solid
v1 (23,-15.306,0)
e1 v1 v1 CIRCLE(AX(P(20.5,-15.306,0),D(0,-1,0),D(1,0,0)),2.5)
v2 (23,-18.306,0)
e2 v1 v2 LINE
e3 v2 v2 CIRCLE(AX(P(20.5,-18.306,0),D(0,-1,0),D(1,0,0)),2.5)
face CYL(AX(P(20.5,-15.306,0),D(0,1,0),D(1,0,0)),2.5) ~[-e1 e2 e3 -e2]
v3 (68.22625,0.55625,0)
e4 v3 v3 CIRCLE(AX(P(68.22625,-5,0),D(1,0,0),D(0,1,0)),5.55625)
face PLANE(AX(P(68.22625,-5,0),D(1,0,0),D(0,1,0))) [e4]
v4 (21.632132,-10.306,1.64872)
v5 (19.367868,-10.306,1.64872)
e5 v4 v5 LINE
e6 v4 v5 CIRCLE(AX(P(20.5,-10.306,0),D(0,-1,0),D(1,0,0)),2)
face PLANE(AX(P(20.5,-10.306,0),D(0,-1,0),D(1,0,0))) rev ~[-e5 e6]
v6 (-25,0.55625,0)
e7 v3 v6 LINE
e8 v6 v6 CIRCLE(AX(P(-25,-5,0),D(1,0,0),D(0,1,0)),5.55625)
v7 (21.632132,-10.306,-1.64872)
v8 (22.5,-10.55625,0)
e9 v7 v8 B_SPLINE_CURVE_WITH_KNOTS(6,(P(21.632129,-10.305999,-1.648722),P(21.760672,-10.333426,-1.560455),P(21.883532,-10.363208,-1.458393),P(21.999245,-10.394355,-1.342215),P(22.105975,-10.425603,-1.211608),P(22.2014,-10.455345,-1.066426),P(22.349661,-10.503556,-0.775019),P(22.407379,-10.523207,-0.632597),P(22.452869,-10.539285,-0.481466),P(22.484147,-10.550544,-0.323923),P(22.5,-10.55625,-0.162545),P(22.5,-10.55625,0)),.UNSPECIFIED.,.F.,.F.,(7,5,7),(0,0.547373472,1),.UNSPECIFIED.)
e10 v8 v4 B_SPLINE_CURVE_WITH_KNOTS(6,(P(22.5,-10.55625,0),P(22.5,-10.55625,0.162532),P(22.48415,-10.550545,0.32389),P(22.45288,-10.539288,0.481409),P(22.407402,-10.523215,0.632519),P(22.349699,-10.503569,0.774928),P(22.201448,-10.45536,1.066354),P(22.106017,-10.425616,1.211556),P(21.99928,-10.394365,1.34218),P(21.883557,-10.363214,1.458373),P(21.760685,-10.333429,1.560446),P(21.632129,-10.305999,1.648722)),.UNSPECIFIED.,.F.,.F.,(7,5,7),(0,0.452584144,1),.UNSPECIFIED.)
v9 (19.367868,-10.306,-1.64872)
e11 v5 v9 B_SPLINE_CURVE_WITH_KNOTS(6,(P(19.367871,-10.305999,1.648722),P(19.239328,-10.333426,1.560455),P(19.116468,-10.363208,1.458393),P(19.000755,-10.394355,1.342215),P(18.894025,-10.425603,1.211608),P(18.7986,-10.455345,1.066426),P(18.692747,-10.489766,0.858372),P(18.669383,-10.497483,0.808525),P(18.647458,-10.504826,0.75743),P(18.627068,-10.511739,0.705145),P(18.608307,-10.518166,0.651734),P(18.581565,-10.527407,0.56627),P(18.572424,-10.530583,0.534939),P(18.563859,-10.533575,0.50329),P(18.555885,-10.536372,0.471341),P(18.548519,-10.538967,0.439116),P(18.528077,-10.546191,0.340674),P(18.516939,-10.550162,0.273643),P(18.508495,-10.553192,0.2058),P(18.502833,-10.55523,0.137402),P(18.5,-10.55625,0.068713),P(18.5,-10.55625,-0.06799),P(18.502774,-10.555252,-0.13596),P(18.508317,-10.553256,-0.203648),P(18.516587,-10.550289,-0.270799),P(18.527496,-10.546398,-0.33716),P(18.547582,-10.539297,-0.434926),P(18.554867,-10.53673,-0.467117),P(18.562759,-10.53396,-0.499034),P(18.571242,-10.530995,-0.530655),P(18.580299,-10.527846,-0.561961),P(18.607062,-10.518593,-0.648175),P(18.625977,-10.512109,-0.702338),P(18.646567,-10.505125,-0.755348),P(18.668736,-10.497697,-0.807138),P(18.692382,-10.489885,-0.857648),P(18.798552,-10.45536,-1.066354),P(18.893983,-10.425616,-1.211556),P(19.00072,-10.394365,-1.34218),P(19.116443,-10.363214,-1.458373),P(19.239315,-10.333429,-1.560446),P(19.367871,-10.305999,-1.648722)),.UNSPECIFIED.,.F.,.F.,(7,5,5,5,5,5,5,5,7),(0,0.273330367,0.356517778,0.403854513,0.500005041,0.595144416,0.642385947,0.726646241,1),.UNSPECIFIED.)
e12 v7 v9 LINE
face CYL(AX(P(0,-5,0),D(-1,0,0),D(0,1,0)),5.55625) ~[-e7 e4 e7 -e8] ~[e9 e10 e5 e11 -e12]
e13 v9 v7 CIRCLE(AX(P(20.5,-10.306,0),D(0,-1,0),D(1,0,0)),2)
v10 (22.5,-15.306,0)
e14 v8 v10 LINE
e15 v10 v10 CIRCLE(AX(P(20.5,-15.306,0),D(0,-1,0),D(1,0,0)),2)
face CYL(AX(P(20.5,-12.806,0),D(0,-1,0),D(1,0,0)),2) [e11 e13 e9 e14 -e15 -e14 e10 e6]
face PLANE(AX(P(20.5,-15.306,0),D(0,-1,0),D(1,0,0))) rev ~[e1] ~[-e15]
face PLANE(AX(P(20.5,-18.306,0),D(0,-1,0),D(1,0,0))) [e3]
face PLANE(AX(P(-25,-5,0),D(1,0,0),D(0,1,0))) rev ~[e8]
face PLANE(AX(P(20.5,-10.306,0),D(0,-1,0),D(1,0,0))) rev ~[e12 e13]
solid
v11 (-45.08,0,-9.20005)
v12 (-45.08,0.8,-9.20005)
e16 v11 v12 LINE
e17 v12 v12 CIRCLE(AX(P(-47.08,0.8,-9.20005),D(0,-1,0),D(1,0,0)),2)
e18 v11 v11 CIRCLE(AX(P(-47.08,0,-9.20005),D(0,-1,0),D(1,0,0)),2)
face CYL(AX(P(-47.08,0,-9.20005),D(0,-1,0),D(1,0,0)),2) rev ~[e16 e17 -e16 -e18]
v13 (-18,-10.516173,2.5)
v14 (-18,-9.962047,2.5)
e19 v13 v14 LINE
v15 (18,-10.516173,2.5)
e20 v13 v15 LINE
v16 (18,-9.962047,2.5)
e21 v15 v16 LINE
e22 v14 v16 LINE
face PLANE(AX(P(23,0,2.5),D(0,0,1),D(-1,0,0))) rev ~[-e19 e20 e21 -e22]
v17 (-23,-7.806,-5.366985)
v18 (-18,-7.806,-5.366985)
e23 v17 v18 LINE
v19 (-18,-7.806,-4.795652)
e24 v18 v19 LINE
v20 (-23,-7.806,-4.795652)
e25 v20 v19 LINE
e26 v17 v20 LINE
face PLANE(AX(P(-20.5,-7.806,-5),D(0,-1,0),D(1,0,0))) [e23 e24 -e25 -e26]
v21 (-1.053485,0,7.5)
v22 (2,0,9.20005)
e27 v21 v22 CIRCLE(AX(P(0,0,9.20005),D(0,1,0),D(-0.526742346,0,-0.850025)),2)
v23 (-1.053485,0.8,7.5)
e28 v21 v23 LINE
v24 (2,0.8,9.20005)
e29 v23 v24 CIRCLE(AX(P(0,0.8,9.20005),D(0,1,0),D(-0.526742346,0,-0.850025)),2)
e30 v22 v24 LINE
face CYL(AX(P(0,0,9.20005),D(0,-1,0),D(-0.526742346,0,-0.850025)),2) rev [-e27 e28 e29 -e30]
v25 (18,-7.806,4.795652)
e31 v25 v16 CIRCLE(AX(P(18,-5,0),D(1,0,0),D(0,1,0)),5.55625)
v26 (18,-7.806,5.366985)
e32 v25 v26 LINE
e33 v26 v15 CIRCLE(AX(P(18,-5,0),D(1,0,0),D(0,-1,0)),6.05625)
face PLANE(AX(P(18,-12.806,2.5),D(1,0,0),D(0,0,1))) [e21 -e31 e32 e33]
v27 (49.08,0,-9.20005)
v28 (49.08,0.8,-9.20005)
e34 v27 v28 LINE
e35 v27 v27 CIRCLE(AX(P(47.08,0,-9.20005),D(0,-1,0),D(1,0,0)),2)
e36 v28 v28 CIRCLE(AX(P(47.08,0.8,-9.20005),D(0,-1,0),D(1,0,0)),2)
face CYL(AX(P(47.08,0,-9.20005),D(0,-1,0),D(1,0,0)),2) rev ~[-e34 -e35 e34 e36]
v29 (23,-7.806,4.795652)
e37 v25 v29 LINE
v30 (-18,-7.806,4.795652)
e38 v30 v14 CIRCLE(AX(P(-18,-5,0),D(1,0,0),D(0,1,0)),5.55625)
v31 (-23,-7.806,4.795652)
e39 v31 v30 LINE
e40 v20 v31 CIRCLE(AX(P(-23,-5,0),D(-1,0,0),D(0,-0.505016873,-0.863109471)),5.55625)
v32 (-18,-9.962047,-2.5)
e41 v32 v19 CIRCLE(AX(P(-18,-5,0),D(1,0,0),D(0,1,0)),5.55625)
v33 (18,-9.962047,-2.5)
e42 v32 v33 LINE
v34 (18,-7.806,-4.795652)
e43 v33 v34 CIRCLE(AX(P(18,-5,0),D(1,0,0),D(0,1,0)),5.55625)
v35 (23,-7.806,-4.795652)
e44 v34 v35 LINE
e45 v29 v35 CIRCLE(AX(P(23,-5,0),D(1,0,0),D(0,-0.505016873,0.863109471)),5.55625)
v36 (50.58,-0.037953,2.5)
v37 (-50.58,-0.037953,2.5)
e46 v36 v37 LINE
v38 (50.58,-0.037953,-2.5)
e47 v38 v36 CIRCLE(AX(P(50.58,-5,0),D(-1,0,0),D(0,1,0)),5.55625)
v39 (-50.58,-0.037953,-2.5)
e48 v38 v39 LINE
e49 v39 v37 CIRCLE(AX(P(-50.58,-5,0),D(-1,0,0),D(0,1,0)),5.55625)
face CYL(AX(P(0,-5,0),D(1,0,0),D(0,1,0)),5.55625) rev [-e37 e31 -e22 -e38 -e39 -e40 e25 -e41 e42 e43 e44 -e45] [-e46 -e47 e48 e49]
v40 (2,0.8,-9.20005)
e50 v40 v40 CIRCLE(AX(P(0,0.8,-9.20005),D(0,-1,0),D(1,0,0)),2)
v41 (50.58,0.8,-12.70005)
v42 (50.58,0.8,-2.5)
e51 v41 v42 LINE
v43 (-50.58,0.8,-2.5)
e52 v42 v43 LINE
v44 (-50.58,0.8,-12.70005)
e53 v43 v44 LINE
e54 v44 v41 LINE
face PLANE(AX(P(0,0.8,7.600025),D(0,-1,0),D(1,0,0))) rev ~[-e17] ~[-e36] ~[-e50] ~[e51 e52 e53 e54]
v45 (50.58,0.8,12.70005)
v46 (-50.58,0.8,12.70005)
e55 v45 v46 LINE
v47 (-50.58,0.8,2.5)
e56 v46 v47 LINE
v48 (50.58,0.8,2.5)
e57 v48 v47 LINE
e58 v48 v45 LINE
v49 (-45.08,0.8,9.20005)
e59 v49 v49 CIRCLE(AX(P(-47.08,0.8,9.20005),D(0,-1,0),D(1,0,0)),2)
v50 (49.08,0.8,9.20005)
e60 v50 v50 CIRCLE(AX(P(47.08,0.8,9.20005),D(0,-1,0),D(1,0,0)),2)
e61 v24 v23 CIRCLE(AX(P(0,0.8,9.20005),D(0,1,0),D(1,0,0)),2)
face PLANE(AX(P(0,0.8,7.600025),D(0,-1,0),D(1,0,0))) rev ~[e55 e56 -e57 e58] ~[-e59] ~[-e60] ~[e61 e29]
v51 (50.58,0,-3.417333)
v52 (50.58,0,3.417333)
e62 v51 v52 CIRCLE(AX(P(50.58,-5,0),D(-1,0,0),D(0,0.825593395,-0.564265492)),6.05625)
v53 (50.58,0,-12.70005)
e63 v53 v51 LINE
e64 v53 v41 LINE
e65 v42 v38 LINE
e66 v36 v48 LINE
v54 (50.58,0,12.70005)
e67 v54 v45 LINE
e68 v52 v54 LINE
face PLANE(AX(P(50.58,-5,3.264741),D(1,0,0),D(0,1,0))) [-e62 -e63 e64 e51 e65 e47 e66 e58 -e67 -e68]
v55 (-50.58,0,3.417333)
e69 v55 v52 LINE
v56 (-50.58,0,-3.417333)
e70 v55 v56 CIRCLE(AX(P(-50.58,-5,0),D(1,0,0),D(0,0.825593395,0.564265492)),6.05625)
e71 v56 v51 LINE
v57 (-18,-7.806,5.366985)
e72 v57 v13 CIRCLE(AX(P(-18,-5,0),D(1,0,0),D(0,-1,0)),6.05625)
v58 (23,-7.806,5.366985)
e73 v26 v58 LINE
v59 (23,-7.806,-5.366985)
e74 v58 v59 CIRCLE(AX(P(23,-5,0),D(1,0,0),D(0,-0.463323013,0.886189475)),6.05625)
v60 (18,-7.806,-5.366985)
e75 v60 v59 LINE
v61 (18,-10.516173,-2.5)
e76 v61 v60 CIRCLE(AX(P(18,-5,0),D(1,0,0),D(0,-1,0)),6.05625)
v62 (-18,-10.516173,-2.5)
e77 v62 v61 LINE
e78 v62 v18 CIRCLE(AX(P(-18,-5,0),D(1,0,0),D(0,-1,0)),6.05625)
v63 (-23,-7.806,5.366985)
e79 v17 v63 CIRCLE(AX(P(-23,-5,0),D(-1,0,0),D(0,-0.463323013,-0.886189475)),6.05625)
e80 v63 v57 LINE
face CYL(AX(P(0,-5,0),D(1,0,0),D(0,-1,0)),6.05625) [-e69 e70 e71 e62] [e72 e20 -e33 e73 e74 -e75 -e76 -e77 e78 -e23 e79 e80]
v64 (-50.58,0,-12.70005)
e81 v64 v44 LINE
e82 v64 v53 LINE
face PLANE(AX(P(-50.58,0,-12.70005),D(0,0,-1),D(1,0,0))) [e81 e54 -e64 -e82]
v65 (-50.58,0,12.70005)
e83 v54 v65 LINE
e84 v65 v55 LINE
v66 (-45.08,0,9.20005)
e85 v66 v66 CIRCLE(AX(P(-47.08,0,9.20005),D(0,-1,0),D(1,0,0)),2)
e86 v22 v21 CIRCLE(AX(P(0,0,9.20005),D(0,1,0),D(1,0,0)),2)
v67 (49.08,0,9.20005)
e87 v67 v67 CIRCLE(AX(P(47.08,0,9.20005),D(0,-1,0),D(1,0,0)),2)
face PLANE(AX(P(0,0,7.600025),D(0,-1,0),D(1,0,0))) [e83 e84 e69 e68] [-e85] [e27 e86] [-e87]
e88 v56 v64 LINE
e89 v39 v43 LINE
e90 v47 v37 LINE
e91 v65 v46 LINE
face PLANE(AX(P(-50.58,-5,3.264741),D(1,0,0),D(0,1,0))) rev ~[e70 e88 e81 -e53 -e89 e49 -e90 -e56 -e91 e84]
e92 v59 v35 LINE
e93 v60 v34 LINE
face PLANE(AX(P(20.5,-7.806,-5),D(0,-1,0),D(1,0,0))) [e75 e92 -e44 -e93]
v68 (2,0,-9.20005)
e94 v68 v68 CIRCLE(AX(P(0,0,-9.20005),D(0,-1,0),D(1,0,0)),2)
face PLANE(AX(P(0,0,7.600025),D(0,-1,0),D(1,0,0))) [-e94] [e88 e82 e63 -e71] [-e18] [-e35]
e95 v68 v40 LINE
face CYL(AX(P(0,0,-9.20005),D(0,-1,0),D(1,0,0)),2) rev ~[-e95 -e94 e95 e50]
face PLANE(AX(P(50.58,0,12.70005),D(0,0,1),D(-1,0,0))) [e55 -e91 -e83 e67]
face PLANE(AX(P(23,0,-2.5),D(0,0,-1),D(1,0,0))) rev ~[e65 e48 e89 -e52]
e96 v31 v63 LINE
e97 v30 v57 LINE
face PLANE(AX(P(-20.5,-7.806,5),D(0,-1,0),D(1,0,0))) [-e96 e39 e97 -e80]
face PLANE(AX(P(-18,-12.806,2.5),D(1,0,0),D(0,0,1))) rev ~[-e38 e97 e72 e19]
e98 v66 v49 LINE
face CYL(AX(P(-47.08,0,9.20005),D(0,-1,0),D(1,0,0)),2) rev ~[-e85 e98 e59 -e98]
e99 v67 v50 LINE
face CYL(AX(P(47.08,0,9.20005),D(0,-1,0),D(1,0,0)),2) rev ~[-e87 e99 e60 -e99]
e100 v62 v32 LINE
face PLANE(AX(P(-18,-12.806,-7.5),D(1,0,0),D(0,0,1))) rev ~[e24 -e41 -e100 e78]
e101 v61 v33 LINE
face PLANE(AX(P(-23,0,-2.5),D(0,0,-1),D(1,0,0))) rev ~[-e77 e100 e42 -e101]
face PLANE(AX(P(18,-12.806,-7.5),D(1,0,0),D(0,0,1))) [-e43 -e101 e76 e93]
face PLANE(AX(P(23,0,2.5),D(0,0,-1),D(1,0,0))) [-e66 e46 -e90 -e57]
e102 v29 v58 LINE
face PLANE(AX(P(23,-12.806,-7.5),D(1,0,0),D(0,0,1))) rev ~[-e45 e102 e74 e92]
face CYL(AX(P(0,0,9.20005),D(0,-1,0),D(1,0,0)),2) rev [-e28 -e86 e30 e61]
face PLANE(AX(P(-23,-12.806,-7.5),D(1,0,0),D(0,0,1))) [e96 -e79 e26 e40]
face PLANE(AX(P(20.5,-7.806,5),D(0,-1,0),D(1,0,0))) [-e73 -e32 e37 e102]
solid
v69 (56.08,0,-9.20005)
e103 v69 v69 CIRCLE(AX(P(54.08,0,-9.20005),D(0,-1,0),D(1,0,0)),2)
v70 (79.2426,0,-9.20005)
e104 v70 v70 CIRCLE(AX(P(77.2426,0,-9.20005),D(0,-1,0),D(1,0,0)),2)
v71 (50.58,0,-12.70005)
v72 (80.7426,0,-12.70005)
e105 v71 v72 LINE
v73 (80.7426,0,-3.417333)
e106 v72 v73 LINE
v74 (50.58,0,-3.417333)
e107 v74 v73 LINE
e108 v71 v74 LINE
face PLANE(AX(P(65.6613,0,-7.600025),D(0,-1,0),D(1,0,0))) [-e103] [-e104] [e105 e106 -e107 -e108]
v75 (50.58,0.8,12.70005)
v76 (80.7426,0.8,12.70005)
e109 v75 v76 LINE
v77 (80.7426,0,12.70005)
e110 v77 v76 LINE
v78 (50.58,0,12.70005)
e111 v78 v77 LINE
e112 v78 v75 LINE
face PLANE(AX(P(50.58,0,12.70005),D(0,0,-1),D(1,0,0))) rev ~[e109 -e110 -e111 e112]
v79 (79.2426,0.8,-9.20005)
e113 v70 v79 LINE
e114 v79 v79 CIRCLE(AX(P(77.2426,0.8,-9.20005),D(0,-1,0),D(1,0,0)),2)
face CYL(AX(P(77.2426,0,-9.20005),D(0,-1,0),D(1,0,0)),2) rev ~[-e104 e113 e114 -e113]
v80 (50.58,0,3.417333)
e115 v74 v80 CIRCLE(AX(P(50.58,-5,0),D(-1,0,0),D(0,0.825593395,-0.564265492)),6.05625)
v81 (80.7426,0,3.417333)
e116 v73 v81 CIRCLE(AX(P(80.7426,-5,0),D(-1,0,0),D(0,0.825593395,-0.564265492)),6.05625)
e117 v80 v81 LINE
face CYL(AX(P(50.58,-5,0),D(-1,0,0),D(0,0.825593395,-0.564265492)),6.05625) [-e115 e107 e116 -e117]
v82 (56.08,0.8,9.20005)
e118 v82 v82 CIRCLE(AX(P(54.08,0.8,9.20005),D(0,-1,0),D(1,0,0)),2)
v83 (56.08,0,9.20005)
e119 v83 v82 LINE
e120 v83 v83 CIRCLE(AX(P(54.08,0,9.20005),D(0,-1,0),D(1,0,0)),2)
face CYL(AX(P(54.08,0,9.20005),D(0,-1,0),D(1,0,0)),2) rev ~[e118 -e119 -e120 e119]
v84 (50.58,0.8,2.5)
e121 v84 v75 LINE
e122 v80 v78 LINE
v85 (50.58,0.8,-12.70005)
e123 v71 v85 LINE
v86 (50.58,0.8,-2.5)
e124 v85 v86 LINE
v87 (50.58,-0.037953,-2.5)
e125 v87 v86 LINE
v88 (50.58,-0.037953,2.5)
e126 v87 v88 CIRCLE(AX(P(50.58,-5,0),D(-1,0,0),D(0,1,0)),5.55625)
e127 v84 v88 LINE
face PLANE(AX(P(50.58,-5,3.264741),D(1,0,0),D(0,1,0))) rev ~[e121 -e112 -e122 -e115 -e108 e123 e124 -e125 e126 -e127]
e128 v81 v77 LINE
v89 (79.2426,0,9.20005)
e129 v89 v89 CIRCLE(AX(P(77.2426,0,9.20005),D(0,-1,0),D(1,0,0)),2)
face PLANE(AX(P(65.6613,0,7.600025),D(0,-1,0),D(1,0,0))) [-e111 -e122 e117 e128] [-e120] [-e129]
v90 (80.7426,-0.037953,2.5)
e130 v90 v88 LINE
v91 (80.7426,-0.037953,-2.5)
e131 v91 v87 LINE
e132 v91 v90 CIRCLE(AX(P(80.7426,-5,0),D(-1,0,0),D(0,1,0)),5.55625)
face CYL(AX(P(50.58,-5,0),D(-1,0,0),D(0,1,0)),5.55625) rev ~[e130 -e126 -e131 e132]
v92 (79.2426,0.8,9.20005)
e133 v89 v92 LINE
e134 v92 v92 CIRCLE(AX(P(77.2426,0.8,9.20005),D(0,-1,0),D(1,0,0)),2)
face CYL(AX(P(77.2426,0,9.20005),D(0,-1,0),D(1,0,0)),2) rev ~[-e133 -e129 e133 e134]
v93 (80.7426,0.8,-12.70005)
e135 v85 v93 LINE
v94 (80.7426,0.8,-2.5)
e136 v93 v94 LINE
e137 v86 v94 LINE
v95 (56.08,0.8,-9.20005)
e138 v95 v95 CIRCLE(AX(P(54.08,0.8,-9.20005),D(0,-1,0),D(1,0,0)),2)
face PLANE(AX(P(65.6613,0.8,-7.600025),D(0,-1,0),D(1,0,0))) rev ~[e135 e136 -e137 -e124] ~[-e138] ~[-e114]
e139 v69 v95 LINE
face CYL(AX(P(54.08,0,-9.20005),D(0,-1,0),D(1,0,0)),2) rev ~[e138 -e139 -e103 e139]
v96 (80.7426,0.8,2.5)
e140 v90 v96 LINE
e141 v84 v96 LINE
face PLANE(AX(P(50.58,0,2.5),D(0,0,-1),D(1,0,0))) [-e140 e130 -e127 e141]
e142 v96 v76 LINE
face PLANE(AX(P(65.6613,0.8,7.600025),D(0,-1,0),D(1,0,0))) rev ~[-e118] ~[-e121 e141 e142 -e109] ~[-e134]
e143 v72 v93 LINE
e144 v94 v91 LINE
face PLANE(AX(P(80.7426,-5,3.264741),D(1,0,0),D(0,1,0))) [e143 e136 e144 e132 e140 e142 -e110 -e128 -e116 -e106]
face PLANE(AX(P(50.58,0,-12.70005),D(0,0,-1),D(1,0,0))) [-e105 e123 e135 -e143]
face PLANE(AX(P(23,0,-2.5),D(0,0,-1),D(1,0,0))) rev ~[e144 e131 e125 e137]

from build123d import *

# Parameters (mm, degrees)
F0_R      = 2
F0_W      = 23
F0_H      = 2.5
F2_DEPTH  = 0.8
F3_DEPTH  = 50.58
F0_W_2    = 30.1626
F0_H_2    = 10.20005
F4_DEPTH  = 0.8
F5_DEPTH  = 30.1626
F6_DEPTH  = 25
F7_DEPTH  = 75
F0_W_3    = 27.58
F0_H_3    = 5
F8_DEPTH  = 2
F10_W     = 5
F10_H     = 5
F11_DEPTH = 5
F12_DEPTH = 25
F13_DEPTH = 50.8
F14_DEPTH = 17.42625
F15_R     = 2
F16_DEPTH = 2.5
F17_R     = 2.5
F17_R_2   = 2.3370450509
F17_R_3   = 2
F18_DEPTH = 3


with BuildPart() as f2:
    # F0 (on Front) → F2 (new body)
    with BuildSketch(Plane.XZ):
        Polygon((50.58, 12.70005), (-50.58, 12.70005), (-50.58, 2.5), (-23, 2.5), (0, 2.5), (23, 2.5), (50.58, 2.5), align=None)
        with Locations((-47.08, 9.20005)):
            Circle(F0_R, mode=Mode.SUBTRACT)
        with BuildLine():
            ThreePointArc((2, 9.20005), (0.9728901826, 7.4526277006), (-1.0534846926, 7.5))
            ThreePointArc((-1.0534846926, 7.5), (-0.9728901826, 10.9474722994), (2, 9.20005))
        make_face(mode=Mode.SUBTRACT)
        with Locations((47.08, 9.20005)):
            Circle(F0_R, mode=Mode.SUBTRACT)
        with Locations((-11.5, -1.25)):
            Rectangle(F0_W, F0_H)
        with Locations((-11.5, 1.25)):
            Rectangle(F0_W, F0_H)
        Polygon((23, -2.5), (23, 2.5), (0, 2.5), (0, 0), (0, -2.5), align=None)
        Polygon((-23, -2.5), (-50.58, -2.5), (-50.58, -12.70005), (50.58, -12.70005), (50.58, -2.5), (23, -2.5), (0, -2.5), align=None)
        with Locations((-47.08, -9.20005)):
            Circle(F0_R, mode=Mode.SUBTRACT)
        with Locations((0, -9.20005)):
            Circle(F0_R, mode=Mode.SUBTRACT)
        with Locations((47.08, -9.20005)):
            Circle(F0_R, mode=Mode.SUBTRACT)
    extrude(amount=-F2_DEPTH)

    # F1 (on Right) → F3 (join, symmetric)
    with BuildSketch(Plane.YZ):
        with BuildLine():
            Line((0.55625, 0), (1.05625, 0))
            ThreePointArc((1.05625, 0), (-5, 6.05625), (-11.05625, 0))
            Line((-11.05625, 0), (-10.55625, 0))
            ThreePointArc((-10.55625, 0), (-5, 5.55625), (0.55625, 0))
        make_face()
        with BuildLine():
            ThreePointArc((-11.05625, 0), (-5, -6.05625), (1.05625, 0))
            Line((1.05625, 0), (0.55625, 0))
            ThreePointArc((0.55625, 0), (-5, -5.55625), (-10.55625, 0))
            Line((-10.55625, 0), (-11.05625, 0))
        make_face()
    extrude(amount=F3_DEPTH, both=True)


with BuildPart() as f4:
    # F0 (on Front) → F4 (new body)
    with BuildSketch(Plane.XZ):
        with Locations((65.6613, 7.600025)):
            Rectangle(F0_W_2, F0_H_2)
        with Locations((54.08, 9.20005)):
            Circle(F0_R, mode=Mode.SUBTRACT)
        with Locations((77.2426, 9.20005)):
            Circle(F0_R, mode=Mode.SUBTRACT)
    extrude(amount=-F4_DEPTH)

    # F5 (add): a face of the model
    f5_faces = [f2.part.faces().sort_by_distance(p)[0] for p in [
        (50.58, 0.2814032225, 8.0586914436),
    ]]


with BuildPart() as f4b:
    # F0 (on Front) → F4, piece 2 (new body)
    with BuildSketch(Plane.XZ):
        with Locations((65.6613, -7.600025)):
            Rectangle(F0_W_2, F0_H_2)
        with Locations((54.08, -9.20005)):
            Circle(F0_R, mode=Mode.SUBTRACT)
        with Locations((77.2426, -9.20005)):
            Circle(F0_R, mode=Mode.SUBTRACT)
    extrude(amount=-F4_DEPTH)


with BuildPart() as f4_1:
    add(f4.part)

    add(f4b.part)  # F5 merges F4b
    extrude(f5_faces, amount=F5_DEPTH)

    # F0 (on Front) → F6 (cut)
    with BuildSketch(Plane.XZ):
        with Locations((54.08, 9.20005)):
            Circle(F0_R)
        with Locations((77.2426, 9.20005)):
            Circle(F0_R)
        with Locations((77.2426, -9.20005)):
            Circle(F0_R)
        with Locations((54.08, -9.20005)):
            Circle(F0_R)
    extrude(amount=-F6_DEPTH, mode=Mode.SUBTRACT)


with BuildPart() as f2_1:
    add(f2.part)

    # F0 (on Front) → F7 (cut, symmetric)
    with BuildSketch(Plane.XZ):
        with Locations((-11.5, -1.25)):
            Rectangle(F0_W, F0_H)
        with Locations((-11.5, 1.25)):
            Rectangle(F0_W, F0_H)
        Polygon((23, -2.5), (23, 2.5), (0, 2.5), (0, 0), (0, -2.5), align=None)
    extrude(amount=F7_DEPTH, both=True, mode=Mode.SUBTRACT)


with BuildPart() as f8_tool:
    # F0 (on Front) → F8 (new body, symmetric)
    with BuildSketch(Plane.XZ):
        Polygon((-23, 2.5), (-50.58, 2.5), (-50.58, -2.5), (-23, -2.5), (-23, 0), align=None)
        with Locations((36.79, 0)):
            Rectangle(F0_W_3, F0_H_3)
        with Locations((65.6613, 0)):
            Rectangle(F0_W_2, F0_H_3)
    extrude(amount=F8_DEPTH, both=True)


with BuildPart() as f2_2:
    add(f2_1.part)

    # F8: cut by f8_tool
    add(f8_tool.part, mode=Mode.SUBTRACT)

    # F10 (on offset) → F11 (cut)
    with BuildSketch(Plane.XZ.offset(12.806)):
        with Locations((-20.5, 5)):
            Rectangle(F10_W, F10_H)
        with Locations((-20.5, -5)):
            Rectangle(F10_W, F10_H)
        with Locations((20.5, 5)):
            Rectangle(F10_W, F10_H)
        with Locations((20.5, -5)):
            Rectangle(F10_W, F10_H)
    extrude(amount=-F11_DEPTH, mode=Mode.SUBTRACT)


with BuildPart() as f4_2:
    add(f4_1.part)

    # F8: cut by f8_tool
    add(f8_tool.part, mode=Mode.SUBTRACT)


with BuildPart() as f12:
    # F1 (on Right) → F12 (new body)
    with BuildSketch(Plane.YZ):
        with BuildLine():
            ThreePointArc((-10.55625, 0), (-5, -5.55625), (0.55625, 0))
            ThreePointArc((0.55625, 0), (-5, 5.55625), (-10.55625, 0))
        make_face()
    extrude(amount=-F12_DEPTH)

    # F1 (on Right) → F13 (join)
    with BuildSketch(Plane.YZ):
        with BuildLine():
            ThreePointArc((-10.55625, 0), (-5, -5.55625), (0.55625, 0))
            ThreePointArc((0.55625, 0), (-5, 5.55625), (-10.55625, 0))
        make_face()
    extrude(amount=F13_DEPTH)

    # F14 (add): a face of the model
    f14_faces = [f12.faces().sort_by_distance(p)[0] for p in [
        (50.8, -5, 0),
    ]]
    extrude(f14_faces, amount=F14_DEPTH)

    # F15 (on offset) → F16 (join, symmetric)
    with BuildSketch(Plane.XZ.offset(12.806)):
        with Locations((20.5, 0)):
            Circle(F15_R)
    extrude(amount=F16_DEPTH, both=True)

    # F17 (on face) → F18 (join)
    with BuildSketch(Plane.XZ.offset(15.306)):
        with Locations((20.5, 0)):
            Circle(F17_R)
        with Locations((20.5, 0)):
            Circle(F17_R_2, mode=Mode.SUBTRACT)
        with Locations((20.5, 0)):
            Circle(F17_R_2)
        with Locations((20.5, 0)):
            Circle(F17_R_3, mode=Mode.SUBTRACT)
        with Locations((20.5, 0)):
            Circle(F17_R_3)
    extrude(amount=F18_DEPTH)


solid = Compound([f2_2.part, f4_2.part, f12.part])
